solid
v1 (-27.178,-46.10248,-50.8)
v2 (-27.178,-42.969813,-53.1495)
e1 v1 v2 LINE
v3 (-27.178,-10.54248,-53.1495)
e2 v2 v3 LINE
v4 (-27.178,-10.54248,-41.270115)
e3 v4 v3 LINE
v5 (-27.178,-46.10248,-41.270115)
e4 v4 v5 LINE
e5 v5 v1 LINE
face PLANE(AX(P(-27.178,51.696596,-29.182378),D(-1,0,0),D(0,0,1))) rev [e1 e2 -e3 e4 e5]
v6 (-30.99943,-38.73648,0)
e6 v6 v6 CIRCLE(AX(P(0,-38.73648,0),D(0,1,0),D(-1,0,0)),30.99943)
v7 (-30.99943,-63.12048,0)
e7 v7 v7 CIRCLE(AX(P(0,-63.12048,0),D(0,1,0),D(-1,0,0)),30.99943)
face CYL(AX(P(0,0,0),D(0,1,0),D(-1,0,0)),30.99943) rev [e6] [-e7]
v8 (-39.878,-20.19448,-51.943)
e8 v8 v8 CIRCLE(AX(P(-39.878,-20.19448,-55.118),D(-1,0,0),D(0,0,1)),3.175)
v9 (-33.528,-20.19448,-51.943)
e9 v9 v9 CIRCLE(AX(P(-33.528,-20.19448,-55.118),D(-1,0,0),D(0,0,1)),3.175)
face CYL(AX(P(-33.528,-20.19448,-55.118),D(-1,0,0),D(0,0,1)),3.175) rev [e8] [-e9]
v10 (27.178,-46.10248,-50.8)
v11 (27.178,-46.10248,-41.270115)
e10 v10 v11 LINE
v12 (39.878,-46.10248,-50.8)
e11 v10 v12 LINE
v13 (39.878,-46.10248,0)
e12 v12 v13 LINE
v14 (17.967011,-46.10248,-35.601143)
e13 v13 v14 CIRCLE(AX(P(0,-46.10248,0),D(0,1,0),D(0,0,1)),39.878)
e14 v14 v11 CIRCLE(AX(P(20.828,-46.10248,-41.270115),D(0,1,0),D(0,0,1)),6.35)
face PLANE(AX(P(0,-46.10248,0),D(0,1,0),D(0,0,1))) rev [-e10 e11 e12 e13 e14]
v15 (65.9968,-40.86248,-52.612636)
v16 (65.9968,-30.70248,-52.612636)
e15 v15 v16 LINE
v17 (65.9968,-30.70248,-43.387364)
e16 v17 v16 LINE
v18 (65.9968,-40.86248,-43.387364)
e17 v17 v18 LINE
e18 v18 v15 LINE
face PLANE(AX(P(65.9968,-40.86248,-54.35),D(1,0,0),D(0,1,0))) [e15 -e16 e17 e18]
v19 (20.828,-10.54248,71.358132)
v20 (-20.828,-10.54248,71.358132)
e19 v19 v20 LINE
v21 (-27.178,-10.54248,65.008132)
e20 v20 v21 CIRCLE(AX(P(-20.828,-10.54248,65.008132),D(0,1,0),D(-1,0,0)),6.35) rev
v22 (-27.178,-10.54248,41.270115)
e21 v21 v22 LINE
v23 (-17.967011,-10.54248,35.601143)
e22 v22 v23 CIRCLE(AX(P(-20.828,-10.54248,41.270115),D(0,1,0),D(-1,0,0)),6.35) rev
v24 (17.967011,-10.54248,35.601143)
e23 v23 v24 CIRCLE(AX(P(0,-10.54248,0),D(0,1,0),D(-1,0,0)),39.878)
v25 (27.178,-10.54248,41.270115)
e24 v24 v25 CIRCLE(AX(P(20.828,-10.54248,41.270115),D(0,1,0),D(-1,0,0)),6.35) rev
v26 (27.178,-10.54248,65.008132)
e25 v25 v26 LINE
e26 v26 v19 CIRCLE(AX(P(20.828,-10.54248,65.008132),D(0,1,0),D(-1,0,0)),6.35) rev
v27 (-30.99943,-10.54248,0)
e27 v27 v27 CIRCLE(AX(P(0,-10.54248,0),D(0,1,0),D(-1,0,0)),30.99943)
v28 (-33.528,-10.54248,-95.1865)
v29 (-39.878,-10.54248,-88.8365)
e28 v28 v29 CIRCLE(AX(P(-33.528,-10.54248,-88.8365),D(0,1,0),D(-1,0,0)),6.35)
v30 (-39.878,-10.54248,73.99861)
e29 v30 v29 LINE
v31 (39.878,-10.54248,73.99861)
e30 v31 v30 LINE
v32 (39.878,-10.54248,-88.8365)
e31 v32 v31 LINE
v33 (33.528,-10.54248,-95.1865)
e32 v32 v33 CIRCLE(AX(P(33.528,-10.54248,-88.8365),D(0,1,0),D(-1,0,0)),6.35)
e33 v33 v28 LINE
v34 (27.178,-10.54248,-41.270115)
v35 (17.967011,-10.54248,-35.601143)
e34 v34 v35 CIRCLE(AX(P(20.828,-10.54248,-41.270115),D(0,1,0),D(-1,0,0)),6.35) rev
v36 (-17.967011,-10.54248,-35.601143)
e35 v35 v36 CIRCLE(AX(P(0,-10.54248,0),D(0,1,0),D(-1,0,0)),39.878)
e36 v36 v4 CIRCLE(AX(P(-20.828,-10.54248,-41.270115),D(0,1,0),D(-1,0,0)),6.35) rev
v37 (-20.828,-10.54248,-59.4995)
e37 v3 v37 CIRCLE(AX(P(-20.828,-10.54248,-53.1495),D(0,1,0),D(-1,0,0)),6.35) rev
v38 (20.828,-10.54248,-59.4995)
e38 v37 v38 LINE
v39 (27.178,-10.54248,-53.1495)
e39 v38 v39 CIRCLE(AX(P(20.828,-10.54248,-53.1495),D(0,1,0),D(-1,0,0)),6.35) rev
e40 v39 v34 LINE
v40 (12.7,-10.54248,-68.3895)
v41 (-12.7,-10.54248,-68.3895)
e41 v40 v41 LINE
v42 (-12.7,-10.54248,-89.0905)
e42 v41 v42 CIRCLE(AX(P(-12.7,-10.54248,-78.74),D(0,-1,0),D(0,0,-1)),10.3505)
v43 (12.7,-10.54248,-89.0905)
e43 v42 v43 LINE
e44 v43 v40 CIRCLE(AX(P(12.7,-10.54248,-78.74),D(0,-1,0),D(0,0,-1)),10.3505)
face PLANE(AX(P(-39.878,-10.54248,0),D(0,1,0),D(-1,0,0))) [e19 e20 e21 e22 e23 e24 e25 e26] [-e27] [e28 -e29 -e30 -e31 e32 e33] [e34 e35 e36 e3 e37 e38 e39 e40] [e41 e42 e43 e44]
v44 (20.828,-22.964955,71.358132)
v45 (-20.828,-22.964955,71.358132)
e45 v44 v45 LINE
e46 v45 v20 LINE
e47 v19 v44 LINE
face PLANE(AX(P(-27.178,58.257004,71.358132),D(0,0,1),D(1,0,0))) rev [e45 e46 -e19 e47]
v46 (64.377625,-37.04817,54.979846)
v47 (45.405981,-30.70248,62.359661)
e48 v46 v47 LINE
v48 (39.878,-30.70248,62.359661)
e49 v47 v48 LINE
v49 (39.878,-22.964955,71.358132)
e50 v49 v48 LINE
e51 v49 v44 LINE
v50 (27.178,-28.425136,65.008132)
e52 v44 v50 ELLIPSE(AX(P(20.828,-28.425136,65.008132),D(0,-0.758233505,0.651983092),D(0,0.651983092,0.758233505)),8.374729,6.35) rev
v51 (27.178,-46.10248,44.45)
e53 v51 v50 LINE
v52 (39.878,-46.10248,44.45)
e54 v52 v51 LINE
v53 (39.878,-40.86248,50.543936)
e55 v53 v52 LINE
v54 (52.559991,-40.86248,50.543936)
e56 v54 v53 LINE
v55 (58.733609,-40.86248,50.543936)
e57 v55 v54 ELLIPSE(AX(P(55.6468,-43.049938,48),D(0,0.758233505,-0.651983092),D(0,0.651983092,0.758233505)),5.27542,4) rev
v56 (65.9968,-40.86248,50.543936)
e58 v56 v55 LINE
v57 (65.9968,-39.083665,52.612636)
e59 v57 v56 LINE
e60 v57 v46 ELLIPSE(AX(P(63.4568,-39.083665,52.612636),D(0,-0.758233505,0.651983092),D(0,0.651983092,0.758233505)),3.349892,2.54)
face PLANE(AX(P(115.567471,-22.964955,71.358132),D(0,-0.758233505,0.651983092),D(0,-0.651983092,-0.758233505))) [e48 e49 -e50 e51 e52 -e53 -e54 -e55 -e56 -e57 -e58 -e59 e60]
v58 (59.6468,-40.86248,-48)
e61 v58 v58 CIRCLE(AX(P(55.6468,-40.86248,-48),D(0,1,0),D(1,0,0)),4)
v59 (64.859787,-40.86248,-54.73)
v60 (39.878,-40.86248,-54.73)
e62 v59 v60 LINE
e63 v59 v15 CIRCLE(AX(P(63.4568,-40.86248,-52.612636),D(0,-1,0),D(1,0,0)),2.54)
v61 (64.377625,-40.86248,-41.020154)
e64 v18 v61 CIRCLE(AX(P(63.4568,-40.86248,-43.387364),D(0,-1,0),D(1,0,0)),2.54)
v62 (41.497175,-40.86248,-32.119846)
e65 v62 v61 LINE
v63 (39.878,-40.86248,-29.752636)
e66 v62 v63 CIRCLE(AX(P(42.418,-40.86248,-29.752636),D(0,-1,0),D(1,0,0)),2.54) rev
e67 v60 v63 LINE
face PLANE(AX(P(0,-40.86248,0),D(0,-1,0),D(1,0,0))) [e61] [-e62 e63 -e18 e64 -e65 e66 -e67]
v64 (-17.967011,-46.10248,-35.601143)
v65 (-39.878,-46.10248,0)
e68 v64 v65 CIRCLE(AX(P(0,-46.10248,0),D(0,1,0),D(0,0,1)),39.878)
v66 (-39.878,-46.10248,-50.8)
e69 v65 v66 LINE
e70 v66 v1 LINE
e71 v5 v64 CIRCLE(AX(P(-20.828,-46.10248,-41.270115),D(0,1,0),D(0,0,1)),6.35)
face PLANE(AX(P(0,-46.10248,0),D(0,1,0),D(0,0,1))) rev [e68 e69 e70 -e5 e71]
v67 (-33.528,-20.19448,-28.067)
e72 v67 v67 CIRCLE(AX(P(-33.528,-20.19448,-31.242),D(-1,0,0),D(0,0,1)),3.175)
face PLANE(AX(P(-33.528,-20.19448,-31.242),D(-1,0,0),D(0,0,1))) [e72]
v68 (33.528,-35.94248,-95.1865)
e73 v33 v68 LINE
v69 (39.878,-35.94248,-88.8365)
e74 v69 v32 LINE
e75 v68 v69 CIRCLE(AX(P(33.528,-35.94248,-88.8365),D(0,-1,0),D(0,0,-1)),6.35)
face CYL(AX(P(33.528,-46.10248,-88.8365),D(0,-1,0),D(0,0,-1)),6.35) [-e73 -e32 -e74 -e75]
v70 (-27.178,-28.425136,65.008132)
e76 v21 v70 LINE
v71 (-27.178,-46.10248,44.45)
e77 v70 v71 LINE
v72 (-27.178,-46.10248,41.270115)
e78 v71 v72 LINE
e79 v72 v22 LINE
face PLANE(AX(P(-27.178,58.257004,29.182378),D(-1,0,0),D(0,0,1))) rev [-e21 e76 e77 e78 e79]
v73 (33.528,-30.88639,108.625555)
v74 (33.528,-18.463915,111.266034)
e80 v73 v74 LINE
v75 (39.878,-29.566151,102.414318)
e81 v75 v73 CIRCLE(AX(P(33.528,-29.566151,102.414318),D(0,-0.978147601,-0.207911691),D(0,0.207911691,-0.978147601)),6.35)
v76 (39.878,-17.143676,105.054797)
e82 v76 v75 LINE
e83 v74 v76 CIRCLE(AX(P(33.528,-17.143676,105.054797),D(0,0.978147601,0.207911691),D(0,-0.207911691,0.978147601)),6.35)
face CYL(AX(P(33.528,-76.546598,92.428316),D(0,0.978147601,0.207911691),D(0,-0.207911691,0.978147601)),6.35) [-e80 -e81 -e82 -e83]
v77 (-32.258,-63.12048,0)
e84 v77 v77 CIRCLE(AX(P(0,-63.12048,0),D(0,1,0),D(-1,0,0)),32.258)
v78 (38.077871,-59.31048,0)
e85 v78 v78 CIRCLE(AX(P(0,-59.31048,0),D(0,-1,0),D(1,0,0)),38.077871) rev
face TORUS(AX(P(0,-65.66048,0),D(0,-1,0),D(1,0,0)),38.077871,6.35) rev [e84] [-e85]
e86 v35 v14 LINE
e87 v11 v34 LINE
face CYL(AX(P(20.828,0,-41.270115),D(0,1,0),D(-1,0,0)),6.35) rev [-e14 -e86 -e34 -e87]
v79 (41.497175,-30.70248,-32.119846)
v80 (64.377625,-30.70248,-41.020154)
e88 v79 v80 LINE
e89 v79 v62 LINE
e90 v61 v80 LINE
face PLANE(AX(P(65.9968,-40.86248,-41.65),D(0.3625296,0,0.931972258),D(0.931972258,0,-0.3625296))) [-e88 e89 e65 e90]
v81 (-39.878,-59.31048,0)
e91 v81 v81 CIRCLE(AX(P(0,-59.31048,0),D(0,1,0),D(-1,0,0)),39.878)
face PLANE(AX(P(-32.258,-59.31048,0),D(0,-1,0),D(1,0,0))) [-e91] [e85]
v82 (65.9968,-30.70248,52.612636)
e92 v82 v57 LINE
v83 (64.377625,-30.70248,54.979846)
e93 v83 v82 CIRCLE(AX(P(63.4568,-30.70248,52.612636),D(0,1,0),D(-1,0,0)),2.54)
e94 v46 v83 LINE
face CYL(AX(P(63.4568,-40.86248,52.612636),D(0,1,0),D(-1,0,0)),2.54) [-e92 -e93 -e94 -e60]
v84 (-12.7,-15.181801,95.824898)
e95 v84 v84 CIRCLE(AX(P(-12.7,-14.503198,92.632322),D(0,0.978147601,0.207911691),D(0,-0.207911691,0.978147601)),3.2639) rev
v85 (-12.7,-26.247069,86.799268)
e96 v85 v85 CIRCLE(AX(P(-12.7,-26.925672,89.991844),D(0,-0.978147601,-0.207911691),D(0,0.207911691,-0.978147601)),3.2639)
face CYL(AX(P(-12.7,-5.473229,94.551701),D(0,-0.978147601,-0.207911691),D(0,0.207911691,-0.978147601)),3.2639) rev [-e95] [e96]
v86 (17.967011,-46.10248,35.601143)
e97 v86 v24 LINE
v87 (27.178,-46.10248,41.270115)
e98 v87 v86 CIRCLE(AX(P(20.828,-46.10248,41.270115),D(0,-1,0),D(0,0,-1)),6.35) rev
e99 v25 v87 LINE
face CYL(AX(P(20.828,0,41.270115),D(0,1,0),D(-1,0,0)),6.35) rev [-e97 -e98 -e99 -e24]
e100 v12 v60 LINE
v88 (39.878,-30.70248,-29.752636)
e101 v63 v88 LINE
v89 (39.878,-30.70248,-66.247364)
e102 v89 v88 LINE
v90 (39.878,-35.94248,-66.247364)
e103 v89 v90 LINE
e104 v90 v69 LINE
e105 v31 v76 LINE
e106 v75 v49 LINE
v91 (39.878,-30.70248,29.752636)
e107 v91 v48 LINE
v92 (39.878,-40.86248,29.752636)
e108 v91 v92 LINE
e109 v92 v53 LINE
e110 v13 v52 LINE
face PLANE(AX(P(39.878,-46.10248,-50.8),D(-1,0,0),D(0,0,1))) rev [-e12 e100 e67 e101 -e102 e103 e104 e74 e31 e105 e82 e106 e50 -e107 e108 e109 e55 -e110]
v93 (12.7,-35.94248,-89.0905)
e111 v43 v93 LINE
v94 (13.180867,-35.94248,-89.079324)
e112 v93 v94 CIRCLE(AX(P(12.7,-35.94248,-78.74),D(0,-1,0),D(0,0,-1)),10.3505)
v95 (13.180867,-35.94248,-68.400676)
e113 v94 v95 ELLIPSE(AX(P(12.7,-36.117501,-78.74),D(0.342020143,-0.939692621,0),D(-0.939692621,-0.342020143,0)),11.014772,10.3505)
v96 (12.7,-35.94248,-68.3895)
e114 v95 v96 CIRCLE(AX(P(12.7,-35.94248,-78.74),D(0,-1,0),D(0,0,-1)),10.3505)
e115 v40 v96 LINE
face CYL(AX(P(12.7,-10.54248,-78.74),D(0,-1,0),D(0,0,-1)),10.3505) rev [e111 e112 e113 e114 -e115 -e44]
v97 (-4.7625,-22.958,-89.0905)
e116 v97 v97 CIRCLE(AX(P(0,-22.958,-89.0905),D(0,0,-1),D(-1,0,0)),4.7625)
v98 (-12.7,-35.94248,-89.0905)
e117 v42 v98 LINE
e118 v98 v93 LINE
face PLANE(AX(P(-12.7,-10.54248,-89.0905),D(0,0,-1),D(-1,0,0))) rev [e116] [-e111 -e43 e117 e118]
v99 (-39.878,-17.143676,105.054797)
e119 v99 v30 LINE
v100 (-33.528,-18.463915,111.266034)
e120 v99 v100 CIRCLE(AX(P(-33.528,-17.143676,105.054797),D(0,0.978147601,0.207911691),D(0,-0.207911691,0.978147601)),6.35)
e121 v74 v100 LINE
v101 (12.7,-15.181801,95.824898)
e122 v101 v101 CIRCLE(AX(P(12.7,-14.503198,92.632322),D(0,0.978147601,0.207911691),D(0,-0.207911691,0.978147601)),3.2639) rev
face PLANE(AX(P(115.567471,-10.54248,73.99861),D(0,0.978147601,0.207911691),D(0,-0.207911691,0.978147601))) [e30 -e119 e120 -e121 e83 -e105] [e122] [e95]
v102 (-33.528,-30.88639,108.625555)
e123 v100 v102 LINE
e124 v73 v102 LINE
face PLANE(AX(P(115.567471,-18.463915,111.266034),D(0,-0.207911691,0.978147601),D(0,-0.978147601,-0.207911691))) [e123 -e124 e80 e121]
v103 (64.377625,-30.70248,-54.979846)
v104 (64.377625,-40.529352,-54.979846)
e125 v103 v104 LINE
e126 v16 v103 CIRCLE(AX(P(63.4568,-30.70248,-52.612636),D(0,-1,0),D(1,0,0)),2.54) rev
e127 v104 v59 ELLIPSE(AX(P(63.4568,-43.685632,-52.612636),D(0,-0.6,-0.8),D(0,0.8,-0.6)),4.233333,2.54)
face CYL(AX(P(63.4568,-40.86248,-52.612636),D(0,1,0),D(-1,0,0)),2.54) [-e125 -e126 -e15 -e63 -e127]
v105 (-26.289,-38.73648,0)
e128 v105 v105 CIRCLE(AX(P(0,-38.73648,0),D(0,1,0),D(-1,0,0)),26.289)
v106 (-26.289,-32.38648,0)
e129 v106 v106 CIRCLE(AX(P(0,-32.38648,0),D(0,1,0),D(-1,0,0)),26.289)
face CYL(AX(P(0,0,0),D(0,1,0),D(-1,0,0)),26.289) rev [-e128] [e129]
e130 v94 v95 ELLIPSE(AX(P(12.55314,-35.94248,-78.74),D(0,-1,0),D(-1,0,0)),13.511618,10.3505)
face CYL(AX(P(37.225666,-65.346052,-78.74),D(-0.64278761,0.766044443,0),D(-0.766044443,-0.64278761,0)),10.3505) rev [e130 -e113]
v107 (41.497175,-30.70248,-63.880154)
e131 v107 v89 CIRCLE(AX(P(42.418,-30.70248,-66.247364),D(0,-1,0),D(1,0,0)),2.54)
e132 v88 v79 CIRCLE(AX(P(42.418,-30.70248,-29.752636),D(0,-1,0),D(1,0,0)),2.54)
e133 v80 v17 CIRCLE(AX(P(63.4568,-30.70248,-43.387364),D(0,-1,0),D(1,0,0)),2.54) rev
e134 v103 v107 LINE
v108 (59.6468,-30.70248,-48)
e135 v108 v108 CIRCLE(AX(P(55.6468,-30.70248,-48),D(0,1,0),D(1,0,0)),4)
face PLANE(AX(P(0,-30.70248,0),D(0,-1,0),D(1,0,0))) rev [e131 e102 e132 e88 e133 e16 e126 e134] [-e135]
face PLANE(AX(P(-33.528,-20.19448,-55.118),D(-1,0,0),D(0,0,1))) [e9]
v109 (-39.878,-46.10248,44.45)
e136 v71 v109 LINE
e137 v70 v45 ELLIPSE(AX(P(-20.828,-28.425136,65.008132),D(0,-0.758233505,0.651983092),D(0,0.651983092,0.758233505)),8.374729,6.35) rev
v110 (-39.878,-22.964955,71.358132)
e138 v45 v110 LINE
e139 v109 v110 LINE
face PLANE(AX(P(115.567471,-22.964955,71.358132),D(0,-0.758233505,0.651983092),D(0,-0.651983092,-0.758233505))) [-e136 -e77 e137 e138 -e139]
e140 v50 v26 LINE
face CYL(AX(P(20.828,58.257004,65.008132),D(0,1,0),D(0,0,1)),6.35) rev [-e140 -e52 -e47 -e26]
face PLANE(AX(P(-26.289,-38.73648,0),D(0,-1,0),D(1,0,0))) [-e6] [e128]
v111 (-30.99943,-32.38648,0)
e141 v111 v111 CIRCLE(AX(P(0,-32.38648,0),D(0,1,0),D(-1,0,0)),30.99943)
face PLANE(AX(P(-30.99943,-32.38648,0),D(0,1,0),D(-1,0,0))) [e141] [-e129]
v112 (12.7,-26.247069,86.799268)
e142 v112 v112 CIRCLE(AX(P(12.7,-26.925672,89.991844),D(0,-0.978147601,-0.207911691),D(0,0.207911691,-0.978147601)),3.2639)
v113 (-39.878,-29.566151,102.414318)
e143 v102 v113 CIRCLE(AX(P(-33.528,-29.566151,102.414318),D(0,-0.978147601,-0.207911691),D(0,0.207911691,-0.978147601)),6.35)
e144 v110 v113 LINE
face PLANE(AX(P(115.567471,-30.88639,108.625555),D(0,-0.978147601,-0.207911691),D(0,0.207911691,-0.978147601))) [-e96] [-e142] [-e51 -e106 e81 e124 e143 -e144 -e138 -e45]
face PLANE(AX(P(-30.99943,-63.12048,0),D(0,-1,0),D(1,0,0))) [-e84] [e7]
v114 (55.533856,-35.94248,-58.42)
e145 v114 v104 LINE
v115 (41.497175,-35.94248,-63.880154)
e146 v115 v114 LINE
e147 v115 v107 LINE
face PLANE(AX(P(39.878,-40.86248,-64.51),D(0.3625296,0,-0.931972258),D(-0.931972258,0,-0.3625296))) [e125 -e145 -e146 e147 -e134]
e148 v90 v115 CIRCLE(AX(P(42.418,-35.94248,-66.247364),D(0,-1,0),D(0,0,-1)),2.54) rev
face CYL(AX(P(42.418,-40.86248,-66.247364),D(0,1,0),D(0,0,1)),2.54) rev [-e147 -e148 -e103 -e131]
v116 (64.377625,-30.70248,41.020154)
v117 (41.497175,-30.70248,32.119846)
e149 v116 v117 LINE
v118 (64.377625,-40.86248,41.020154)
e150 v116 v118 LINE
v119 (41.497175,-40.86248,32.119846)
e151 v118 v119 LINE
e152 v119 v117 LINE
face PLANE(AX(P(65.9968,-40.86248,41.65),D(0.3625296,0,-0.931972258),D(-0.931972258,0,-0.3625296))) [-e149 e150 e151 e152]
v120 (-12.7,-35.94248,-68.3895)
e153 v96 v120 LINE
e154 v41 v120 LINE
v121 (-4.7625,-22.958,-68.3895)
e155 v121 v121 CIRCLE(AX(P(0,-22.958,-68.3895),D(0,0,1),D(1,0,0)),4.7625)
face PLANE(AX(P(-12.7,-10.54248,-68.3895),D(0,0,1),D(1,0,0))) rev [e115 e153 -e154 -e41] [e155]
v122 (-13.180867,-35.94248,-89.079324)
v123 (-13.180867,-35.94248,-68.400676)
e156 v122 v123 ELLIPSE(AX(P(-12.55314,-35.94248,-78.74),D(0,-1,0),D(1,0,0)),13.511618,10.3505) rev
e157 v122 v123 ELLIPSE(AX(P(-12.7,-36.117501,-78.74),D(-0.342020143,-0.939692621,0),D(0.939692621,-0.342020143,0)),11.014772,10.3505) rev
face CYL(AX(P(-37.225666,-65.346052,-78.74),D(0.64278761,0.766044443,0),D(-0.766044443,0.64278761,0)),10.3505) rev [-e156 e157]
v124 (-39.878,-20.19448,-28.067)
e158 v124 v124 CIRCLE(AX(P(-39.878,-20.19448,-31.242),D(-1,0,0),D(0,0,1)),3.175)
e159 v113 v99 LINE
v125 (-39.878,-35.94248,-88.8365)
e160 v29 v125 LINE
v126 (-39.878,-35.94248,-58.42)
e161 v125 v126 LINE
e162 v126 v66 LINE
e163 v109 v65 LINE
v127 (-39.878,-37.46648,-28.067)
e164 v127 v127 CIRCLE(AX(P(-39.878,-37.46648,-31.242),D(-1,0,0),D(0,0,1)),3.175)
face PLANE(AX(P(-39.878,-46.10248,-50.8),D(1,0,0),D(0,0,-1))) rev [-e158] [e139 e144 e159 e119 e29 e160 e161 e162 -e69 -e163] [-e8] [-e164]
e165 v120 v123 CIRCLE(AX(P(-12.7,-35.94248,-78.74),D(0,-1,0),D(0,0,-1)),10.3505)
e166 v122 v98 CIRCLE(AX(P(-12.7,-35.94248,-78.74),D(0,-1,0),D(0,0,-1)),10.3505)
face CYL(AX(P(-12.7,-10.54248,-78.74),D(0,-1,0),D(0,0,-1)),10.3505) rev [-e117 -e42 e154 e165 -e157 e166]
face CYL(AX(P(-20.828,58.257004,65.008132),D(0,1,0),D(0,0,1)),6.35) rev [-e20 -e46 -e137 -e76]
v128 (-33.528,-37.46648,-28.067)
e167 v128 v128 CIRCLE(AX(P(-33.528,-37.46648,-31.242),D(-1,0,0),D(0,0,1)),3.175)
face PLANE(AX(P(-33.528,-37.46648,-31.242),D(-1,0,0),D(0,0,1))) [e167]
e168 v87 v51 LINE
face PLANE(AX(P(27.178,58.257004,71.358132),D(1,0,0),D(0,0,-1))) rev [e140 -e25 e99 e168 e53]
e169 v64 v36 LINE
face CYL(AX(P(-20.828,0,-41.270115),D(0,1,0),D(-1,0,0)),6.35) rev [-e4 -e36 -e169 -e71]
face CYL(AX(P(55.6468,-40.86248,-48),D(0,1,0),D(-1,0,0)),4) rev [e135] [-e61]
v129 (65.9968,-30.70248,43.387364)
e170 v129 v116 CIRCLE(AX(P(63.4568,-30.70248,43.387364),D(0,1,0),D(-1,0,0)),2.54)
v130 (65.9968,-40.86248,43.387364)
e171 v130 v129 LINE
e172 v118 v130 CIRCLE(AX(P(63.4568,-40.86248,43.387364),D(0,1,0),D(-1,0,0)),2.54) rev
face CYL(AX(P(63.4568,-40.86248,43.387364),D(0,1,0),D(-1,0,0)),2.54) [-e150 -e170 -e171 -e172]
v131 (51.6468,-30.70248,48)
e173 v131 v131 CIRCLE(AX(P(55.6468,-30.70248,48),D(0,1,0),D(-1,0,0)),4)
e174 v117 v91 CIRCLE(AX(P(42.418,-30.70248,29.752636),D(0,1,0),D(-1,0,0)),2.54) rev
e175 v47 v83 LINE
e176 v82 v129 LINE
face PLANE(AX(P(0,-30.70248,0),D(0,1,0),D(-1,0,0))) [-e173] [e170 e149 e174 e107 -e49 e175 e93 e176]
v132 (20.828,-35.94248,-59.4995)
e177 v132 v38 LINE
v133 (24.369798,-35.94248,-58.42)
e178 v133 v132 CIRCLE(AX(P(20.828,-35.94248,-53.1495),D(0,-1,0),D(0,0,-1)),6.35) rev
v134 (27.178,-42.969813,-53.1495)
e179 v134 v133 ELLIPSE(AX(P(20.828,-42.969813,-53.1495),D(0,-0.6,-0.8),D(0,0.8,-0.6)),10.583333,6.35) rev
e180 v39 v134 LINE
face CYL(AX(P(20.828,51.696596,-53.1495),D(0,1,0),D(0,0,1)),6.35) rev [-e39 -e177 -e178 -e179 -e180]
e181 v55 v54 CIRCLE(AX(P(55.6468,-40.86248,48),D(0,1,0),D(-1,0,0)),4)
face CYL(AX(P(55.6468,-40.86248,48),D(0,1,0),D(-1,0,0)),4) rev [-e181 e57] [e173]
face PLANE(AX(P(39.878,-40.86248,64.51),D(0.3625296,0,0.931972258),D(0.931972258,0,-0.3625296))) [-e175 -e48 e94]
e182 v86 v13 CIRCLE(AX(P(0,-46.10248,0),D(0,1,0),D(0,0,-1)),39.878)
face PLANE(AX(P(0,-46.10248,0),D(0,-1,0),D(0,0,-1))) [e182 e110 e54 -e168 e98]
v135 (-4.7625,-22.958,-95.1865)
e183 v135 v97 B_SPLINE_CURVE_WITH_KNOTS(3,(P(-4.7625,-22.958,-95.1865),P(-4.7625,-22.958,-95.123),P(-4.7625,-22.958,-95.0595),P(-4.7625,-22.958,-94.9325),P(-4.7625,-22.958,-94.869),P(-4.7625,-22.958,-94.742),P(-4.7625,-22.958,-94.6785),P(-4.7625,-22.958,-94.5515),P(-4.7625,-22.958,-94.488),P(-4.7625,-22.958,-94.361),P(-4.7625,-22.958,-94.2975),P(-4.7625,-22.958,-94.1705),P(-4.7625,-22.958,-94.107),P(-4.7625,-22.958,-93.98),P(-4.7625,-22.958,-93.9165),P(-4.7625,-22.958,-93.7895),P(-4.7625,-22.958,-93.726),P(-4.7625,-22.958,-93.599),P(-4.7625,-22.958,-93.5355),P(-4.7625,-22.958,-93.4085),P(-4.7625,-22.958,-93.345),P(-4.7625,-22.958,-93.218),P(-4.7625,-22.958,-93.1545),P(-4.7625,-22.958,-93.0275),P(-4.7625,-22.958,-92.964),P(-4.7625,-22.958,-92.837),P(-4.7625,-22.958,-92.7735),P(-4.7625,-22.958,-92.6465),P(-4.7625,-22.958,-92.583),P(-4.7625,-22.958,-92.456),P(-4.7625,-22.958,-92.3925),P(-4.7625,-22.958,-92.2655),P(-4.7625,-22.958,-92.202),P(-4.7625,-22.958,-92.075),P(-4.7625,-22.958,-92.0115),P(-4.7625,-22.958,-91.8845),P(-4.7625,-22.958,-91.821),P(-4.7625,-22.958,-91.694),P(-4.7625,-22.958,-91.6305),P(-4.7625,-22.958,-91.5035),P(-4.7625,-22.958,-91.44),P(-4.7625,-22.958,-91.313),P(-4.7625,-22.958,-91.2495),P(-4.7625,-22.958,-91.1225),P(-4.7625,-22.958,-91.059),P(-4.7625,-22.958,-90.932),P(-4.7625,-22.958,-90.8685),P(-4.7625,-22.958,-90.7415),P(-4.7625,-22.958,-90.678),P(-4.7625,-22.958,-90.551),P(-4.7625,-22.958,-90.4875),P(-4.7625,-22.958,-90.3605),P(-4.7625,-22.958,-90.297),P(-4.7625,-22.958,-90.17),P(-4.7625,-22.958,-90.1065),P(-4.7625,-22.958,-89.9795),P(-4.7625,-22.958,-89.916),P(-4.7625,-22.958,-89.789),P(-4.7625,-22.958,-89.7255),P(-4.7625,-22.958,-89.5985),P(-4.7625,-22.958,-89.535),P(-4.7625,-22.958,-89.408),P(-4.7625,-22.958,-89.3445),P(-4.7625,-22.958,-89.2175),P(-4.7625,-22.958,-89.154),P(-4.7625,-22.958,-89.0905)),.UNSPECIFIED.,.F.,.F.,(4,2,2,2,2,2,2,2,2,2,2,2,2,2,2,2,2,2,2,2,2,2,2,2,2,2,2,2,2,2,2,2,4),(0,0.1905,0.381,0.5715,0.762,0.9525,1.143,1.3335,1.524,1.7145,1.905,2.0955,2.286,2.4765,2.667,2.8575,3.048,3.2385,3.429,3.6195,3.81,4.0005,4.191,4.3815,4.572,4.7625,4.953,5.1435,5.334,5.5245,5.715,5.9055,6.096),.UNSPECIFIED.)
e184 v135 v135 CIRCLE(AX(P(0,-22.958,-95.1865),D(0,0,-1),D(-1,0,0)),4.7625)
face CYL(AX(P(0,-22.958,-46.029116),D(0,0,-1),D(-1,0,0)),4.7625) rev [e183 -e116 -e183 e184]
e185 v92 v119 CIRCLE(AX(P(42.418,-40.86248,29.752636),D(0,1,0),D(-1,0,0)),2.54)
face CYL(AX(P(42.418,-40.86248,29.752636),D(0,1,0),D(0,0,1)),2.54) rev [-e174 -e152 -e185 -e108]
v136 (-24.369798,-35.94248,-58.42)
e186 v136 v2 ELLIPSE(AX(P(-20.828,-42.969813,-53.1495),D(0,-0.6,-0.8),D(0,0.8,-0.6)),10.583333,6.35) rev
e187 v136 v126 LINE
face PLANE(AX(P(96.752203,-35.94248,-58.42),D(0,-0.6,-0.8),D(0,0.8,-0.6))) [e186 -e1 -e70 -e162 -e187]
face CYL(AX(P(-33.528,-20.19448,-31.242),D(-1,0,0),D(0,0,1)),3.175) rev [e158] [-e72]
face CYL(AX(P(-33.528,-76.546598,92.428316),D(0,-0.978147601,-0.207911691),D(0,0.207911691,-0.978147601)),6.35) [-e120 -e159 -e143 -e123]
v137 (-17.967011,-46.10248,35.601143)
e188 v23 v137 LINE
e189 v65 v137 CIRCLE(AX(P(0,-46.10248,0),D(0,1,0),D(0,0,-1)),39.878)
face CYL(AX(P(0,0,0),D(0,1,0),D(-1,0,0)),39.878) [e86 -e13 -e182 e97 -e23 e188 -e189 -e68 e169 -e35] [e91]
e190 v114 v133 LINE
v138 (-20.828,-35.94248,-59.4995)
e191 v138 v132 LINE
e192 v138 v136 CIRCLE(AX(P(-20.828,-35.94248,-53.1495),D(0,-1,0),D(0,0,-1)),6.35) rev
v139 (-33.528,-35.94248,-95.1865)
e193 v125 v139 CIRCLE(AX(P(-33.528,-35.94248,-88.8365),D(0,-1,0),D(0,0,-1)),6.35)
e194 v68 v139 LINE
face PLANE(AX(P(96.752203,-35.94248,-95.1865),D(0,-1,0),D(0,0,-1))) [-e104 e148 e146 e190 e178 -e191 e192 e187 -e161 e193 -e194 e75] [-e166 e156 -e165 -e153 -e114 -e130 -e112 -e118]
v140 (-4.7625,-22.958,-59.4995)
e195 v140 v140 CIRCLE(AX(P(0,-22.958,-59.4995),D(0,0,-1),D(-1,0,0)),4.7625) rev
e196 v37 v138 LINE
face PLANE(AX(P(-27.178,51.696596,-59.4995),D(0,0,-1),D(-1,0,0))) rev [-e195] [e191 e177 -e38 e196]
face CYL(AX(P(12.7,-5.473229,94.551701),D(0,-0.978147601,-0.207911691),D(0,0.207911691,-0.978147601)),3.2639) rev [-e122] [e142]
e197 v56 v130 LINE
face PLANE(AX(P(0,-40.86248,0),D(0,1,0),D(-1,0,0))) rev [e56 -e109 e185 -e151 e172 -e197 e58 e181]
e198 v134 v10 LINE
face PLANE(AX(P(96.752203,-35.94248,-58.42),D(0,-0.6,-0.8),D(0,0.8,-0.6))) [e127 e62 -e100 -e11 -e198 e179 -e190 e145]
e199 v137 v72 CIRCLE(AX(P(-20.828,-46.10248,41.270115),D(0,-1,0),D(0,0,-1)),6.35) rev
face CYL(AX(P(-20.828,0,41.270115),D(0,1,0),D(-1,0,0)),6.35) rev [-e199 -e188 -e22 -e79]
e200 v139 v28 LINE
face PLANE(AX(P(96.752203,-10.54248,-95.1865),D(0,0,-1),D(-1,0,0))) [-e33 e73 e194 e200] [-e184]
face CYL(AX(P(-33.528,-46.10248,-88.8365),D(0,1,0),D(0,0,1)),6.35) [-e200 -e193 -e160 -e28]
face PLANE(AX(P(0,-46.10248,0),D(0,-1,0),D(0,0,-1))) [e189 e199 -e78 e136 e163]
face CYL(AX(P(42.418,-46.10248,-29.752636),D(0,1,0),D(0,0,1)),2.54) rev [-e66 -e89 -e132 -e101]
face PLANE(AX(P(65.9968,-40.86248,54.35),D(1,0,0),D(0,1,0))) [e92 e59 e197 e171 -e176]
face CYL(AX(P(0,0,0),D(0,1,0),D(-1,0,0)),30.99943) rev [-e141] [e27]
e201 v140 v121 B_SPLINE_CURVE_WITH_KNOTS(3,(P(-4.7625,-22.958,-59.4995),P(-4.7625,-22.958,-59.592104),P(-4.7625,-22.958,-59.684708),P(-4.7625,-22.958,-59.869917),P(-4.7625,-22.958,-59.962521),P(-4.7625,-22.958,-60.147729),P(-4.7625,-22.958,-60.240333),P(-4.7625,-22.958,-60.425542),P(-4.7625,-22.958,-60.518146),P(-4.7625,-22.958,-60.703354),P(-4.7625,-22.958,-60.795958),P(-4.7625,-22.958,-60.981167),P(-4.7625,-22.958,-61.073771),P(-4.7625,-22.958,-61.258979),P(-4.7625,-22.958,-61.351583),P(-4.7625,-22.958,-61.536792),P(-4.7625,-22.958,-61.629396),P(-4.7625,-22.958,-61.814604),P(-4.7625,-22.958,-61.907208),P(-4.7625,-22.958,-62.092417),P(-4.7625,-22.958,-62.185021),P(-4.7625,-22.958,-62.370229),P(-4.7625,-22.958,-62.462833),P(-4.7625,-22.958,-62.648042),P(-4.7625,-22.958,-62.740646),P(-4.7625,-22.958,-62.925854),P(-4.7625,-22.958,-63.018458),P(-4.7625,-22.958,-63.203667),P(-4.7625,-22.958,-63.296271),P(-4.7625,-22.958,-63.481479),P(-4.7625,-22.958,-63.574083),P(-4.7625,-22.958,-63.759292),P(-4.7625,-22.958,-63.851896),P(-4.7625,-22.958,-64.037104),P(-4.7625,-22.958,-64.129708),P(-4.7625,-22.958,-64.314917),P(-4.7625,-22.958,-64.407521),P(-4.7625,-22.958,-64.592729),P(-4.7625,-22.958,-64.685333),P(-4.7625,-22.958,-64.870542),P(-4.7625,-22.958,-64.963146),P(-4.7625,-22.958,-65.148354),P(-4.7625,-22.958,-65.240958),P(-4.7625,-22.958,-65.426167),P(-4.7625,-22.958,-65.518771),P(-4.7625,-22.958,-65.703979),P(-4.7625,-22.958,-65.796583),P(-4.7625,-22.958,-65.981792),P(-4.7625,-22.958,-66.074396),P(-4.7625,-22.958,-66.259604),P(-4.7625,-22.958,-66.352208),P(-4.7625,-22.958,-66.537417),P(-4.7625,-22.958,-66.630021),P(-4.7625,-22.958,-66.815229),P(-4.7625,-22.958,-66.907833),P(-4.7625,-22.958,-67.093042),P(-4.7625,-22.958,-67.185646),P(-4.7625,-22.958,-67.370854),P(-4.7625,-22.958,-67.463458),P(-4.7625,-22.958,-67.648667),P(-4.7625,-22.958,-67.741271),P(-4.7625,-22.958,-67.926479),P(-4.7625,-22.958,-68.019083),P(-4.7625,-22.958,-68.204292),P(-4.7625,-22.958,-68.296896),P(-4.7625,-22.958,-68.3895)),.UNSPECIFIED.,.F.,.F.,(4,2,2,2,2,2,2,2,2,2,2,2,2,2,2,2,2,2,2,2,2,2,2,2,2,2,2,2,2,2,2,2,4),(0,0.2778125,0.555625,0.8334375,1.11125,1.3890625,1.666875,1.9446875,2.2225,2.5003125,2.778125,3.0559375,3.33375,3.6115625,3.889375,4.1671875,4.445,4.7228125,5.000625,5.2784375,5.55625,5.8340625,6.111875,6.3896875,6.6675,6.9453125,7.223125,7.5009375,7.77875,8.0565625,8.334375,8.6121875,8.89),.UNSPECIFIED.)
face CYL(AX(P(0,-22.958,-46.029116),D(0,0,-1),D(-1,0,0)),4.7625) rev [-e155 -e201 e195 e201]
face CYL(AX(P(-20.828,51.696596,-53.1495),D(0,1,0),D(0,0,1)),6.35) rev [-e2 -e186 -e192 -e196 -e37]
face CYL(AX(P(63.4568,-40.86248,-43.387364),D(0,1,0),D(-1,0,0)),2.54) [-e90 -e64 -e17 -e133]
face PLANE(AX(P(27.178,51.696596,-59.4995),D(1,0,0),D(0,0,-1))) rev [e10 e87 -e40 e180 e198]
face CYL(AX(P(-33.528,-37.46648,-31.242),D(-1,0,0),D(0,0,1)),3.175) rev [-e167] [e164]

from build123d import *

# Parameters (mm, degrees)
BEARING_FILLET_R         = 6.35
LBJ_PREP_DEPTH           = 35.56
LBJ_EXTRUDE_DEPTH        = 79.756
LBJ_SLOT_DEPTH           = 107.720983645
LBJ_WEIGHT_SAIVNG_REACH  = 111.157
LBJ_FILLET_R             = 6.35
LBJ_HOLE_REACH           = 156.327
SKETCH12_R               = 4.7625
LBJ_WIDENING_DEPTH       = 147.443500502
UBJ_AREA_PREP_DEPTH      = 35.56
UBJ_ANGLE_MOUNT_DEPTH    = 79.756
SKETCH7_R                = 3.2639
CAMBER_BLOCK_HOLES_DEPTH = 12.7
UBJ_WEIGHT_SAVING_REACH  = 125.43
UBJ_FILLETS_R            = 6.35
SKETCH13_R               = 4
BRAKE_ARMS_DEPTH         = 10.16
UPPER_BRAKE_CUT_DEPTH    = 151.749278078
LOWER_BRAKE_CUT_DEPTH    = 151.749278078
FILLET1_R                = 2.54
SKETCH14_R               = 3.175
TIE_ROD_MOUND_DEPTH      = 6.35
FILLET2_R                = 6.35


with BuildPart() as part:
    # Sketch1 → Bearing Housing (revolve)
    with BuildSketch(Plane.XY):
        Polygon((-30.99943, -10.54248), (-30.99943, -32.38648), (-26.289, -32.38648), (-26.289, -38.73648), (-30.99943, -38.73648), (-30.99943, -63.12048), (-32.258, -63.12048), (-32.258, -59.31048), (-39.878, -59.31048), (-39.878, -10.54248), align=None)
    revolve(axis=Axis((0, 0, 0), (0, -1, 0)))

    # Bearing Fillet
    # the kernel refuses this fillet: 6.35 mm, written as the material it adds along each edge
    with BuildSketch(Plane(origin=(0, -59.31048, 0), x_dir=(-1, 0, 0), z_dir=(0, 0, 1))) as bearing_fillet_piece_1:
        with BuildLine():
            CenterArc((38.077871133, 6.35), BEARING_FILLET_R, 203.578178478, 66.421821522)
            Line((38.077871133, 0), (38.077871133, -0.127))
            Line((38.077871133, -0.127), (32.258, -0.127))
            Line((32.258, -0.127), (32.131, 0))
            ThreePointArc((32.131, 0), (32.131, 1.905), (32.141602577, 3.7592))
            Line((32.141602577, 3.7592), (32.258, 3.81))
        make_face()
    revolve(axis=Axis((0, -59.31048, 0), (0, -1, 0)))

    # Sketch2 → LBJ Prep (add)
    with BuildSketch(Plane(origin=(0, -10.54248, 0), x_dir=(-1, 0, 0), z_dir=(0, -1, 0))):
        with BuildLine():
            Line((-39.878, 50.8), (-39.878, 0))
            ThreePointArc((-39.878, 0), (0, 39.878), (39.878, 0))
            Line((39.878, 0), (39.878, 50.8))
            Line((39.878, 50.8), (-39.878, 50.8))
        make_face()
    extrude(amount=LBJ_PREP_DEPTH)

    # Sketch3 → LBJ Extrude (add)
    with BuildSketch(Plane.ZY.offset(39.878)):
        Polygon((-50.8, -10.54248), (-95.1865, -10.54248), (-95.1865, -35.94248), (-58.42, -35.94248), (-50.8, -46.10248), align=None)
    extrude(amount=-LBJ_EXTRUDE_DEPTH)

    # Sketch4 → LBJ Slot (cut, through all)
    with BuildSketch(Plane.XZ.offset(35.94248)):
        with BuildLine():
            Line((-12.7, -68.3895), (12.7, -68.3895))
            ThreePointArc((12.7, -68.3895), (23.0505, -78.74), (12.7, -89.0905))
            Line((12.7, -89.0905), (-12.7, -89.0905))
            ThreePointArc((-12.7, -89.0905), (-23.0505, -78.74), (-12.7, -68.3895))
        make_face()
    extrude(amount=-LBJ_SLOT_DEPTH, mode=Mode.SUBTRACT)

    # Sketch8 → LBJ Weight Saivng (cut, up to next)
    with BuildSketch(Plane.XZ.offset(46.10248), mode=Mode.PRIVATE) as lbj_weight_saivng_sk1:
        with BuildLine():
            Line((-27.178, -29.182378244), (-27.178, -59.4995))
            Line((-27.178, -59.4995), (27.178, -59.4995))
            Line((27.178, -59.4995), (27.178, -29.182378244))
            ThreePointArc((27.178, -29.182378244), (0, -39.878), (-27.178, -29.182378244))
        make_face()
    lbj_weight_saivng_tool1 = extrude(lbj_weight_saivng_sk1.sketch, amount=-LBJ_WEIGHT_SAIVNG_REACH, mode=Mode.PRIVATE) & part.part
    add(lbj_weight_saivng_tool1.solids().sort_by_distance((0, -46.10248, -47.803718))[0], mode=Mode.SUBTRACT)

    # LBJ Fillet
    # the kernel refuses this fillet: 6.35 mm, written as the material it adds along each edge
    with BuildSketch(Plane(origin=(-27.178, -35.94248, -59.4995), x_dir=(0, 0, 1), z_dir=(0, 1, 0))) as lbj_fillet_piece_1_section:
        with BuildLine():
            CenterArc((LBJ_FILLET_R, LBJ_FILLET_R), LBJ_FILLET_R, 180, 90)
            Line((0, LBJ_FILLET_R), (0, 0))
            Line((0, 0), (LBJ_FILLET_R, 0))
        make_face()
    lbj_fillet_piece_1 = extrude(amount=25.4, mode=Mode.PRIVATE)
    lbj_fillet_piece_1 = split(lbj_fillet_piece_1, bisect_by=Plane(origin=(-24.73120958, -35.160405559, -59.00655583), z_dir=(0, -0.6000000000000006, -0.7999999999999996)), keep=Keep.TOP, mode=Mode.PRIVATE)
    add(lbj_fillet_piece_1)
    with BuildSketch(Plane(origin=(-27.178, -51.81748, -59.4995), x_dir=(0, 0, 1), z_dir=(0, 1, 0))) as lbj_fillet_piece_2_section:
        with BuildLine():
            CenterArc((LBJ_FILLET_R, LBJ_FILLET_R), LBJ_FILLET_R, 180, 90)
            Line((0, LBJ_FILLET_R), (0, 0))
            Line((0, 0), (LBJ_FILLET_R, 0))
        make_face()
    lbj_fillet_piece_2 = extrude(amount=41.275, mode=Mode.PRIVATE)
    lbj_fillet_piece_2 = split(lbj_fillet_piece_2, bisect_by=Plane(origin=(-26.809097356, -38.125416815, -56.782797389), z_dir=(0, 0.6000000000000006, 0.7999999999999996)), keep=Keep.TOP, mode=Mode.PRIVATE)
    lbj_fillet_piece_2 = split(lbj_fillet_piece_2, bisect_by=Plane(origin=(-26.809097356, -35.94248, -56.0123491), z_dir=(0, -1, 0)), keep=Keep.TOP, mode=Mode.PRIVATE)
    add(lbj_fillet_piece_2)
    with BuildSketch(Plane(origin=(-27.178, -35.94248, -59.4995), x_dir=(0, 0, 1), z_dir=(0, 1, 0))) as lbj_fillet_piece_3_section:
        with BuildLine():
            CenterArc((LBJ_FILLET_R, LBJ_FILLET_R), LBJ_FILLET_R, 180, 90)
            Line((0, LBJ_FILLET_R), (0, 0))
            Line((0, 0), (LBJ_FILLET_R, 0))
        make_face()
    lbj_fillet_piece_3 = extrude(amount=25.4, mode=Mode.PRIVATE)
    lbj_fillet_piece_3 = split(lbj_fillet_piece_3, bisect_by=Plane(origin=(-25.759204024, -27.852635119, -64.487383661), z_dir=(0, 0.6000000000000006, 0.7999999999999996)), keep=Keep.TOP, mode=Mode.PRIVATE)
    add(lbj_fillet_piece_3)
    with BuildSketch(Plane(origin=(27.178, -35.94248, -59.4995), x_dir=(0, 0, 1), z_dir=(0, 1, 0))) as lbj_fillet_piece_4_section:
        with BuildLine():
            CenterArc((LBJ_FILLET_R, -LBJ_FILLET_R), LBJ_FILLET_R, 90, 90)
            Line((0, -LBJ_FILLET_R), (0, 0))
            Line((0, 0), (LBJ_FILLET_R, 0))
        make_face()
    lbj_fillet_piece_4 = extrude(amount=25.4, mode=Mode.PRIVATE)
    lbj_fillet_piece_4 = split(lbj_fillet_piece_4, bisect_by=Plane(origin=(24.73120958, -35.160405559, -59.00655583), z_dir=(0, -0.6000000000000006, -0.7999999999999996)), keep=Keep.TOP, mode=Mode.PRIVATE)
    add(lbj_fillet_piece_4)
    with BuildSketch(Plane(origin=(27.178, -51.81748, -59.4995), x_dir=(0, 0, 1), z_dir=(0, 1, 0))) as lbj_fillet_piece_5_section:
        with BuildLine():
            CenterArc((LBJ_FILLET_R, -LBJ_FILLET_R), LBJ_FILLET_R, 90, 90)
            Line((0, -LBJ_FILLET_R), (0, 0))
            Line((0, 0), (LBJ_FILLET_R, 0))
        make_face()
    lbj_fillet_piece_5 = extrude(amount=41.275, mode=Mode.PRIVATE)
    lbj_fillet_piece_5 = split(lbj_fillet_piece_5, bisect_by=Plane(origin=(26.809097356, -35.94248, -56.0123491), z_dir=(0, -1, 0)), keep=Keep.TOP, mode=Mode.PRIVATE)
    lbj_fillet_piece_5 = split(lbj_fillet_piece_5, bisect_by=Plane(origin=(26.809097356, -38.125416815, -56.782797389), z_dir=(0, 0.6000000000000006, 0.7999999999999996)), keep=Keep.TOP, mode=Mode.PRIVATE)
    add(lbj_fillet_piece_5)
    with BuildSketch(Plane(origin=(27.178, -35.94248, -59.4995), x_dir=(0, 0, 1), z_dir=(0, 1, 0))) as lbj_fillet_piece_6_section:
        with BuildLine():
            CenterArc((LBJ_FILLET_R, -LBJ_FILLET_R), LBJ_FILLET_R, 90, 90)
            Line((0, -LBJ_FILLET_R), (0, 0))
            Line((0, 0), (LBJ_FILLET_R, 0))
        make_face()
    lbj_fillet_piece_6 = extrude(amount=25.4, mode=Mode.PRIVATE)
    lbj_fillet_piece_6 = split(lbj_fillet_piece_6, bisect_by=Plane(origin=(25.759204024, -27.852635119, -64.487383661), z_dir=(0, 0.6000000000000006, 0.7999999999999996)), keep=Keep.TOP, mode=Mode.PRIVATE)
    add(lbj_fillet_piece_6)
    with BuildSketch(Plane(origin=(27.178, -46.10248, -29.182378244), x_dir=(-0.8204405839916293, 0, -0.5717317973835934), z_dir=(0, 1, 0))) as lbj_fillet_piece_7:
        with BuildLine():
            CenterArc((12.120741225, -6.286772968), LBJ_FILLET_R, 98.09213616, 116.778941593)
            Line((6.910943516, -9.917269881), (0, 0))
            ThreePointArc((0, 0), (5.613440626, -0.397065762), (11.226881252, 0))
        make_face()
    extrude(amount=35.56)
    with BuildSketch(Plane(origin=(-27.178, -46.10248, -29.182378244), x_dir=(0.8204405839916298, 0, -0.5717317973835926), z_dir=(0, 1, 0))) as lbj_fillet_piece_8:
        with BuildLine():
            CenterArc((12.120741225, 6.286772968), LBJ_FILLET_R, 145.128922247, 116.778941593)
            Line((6.910943516, 9.917269881), (0, 0))
            ThreePointArc((0, 0), (5.613440626, 0.397065762), (11.226881252, 0))
        make_face()
    extrude(amount=35.56)

    # LBJ Hole: up to this face of the body (flat: up to its plane)
    lbj_hole_end = Plane(part.part.faces().sort_by_distance((0, -23.24248, -59.4995))[0])
    # Sketch12 → LBJ Hole (cut, up to the picked face)
    with BuildSketch(Plane(origin=(0, 0, -95.1865), x_dir=(-1, 0, 0), z_dir=(0, 0, -1)), mode=Mode.PRIVATE) as lbj_hole_sk1:
        with Locations((0, -22.958000058)):
            Circle(SKETCH12_R)
    lbj_hole_tool1 = split(extrude(lbj_hole_sk1.sketch, amount=-LBJ_HOLE_REACH, mode=Mode.PRIVATE), bisect_by=lbj_hole_end, keep=Keep.BOTH, mode=Mode.PRIVATE)
    add(lbj_hole_tool1.solids().sort_by(Axis((0, -22.958, -95.1865), (0, 0, 1)))[0], mode=Mode.SUBTRACT)

    # Sketch17 → LBJ Widening (cut, through all)
    with BuildSketch(Plane(origin=(0, -22.958000058, -95.1865), x_dir=(-0.7660444431189768, 0.6427876096865408, 0), z_dir=(-0.6427876096865408, -0.7660444431189768, 0))):
        with BuildLine():
            Line((-1.27, -6.096), (1.27, -6.096))
            ThreePointArc((1.27, -6.096), (11.6205, -16.4465), (1.27, -26.797))
            Line((1.27, -26.797), (-1.27, -26.797))
            ThreePointArc((-1.27, -26.797), (-11.6205, -16.4465), (-1.27, -6.096))
        make_face()
    lbj_widening = extrude(amount=LBJ_WIDENING_DEPTH, mode=Mode.SUBTRACT)

    # LBJ Widening 2: LBJ Widening across plane
    add(lbj_widening.mirror(Plane(origin=(0, 0, 0), x_dir=(0, 0, 1), z_dir=(1, 0, 0))), mode=Mode.SUBTRACT)

    # Sketch5 → UBJ Area Prep (add)
    with BuildSketch(Plane(origin=(0, -10.54248, 0), x_dir=(-1, 0, 0), z_dir=(0, -1, 0))):
        with BuildLine():
            Line((-39.878, -44.45), (39.878, -44.45))
            Line((39.878, -44.45), (39.878, 0))
            ThreePointArc((39.878, 0), (0, -39.878), (-39.878, 0))
            Line((-39.878, 0), (-39.878, -44.45))
        make_face()
    extrude(amount=UBJ_AREA_PREP_DEPTH)

    # UBJ Angle → UBJ Angle Mount (add)
    with BuildSketch(Plane.ZY.offset(39.878)):
        Polygon((44.45, -10.54248), (73.998610356, -10.54248), (111.266033944, -18.46391542), (108.62555547, -30.886389949), (71.358131882, -22.964954529), (44.45, -46.10248), align=None)
    extrude(amount=-UBJ_ANGLE_MOUNT_DEPTH)

    # Sketch7 → Camber Block Holes (cut)
    with BuildSketch(Plane(origin=(0, -7.460258703, -1.585726939), x_dir=(1, 0, 0), z_dir=(0, -0.9781476007338056, -0.2079116908177598))):
        with Locations(Location((-12.7, 93.623468019, 0), (0, 0, 270))):
            Circle(SKETCH7_R)
        with Locations(Location((12.7, 93.623468019, 0), (0, 0, 270))):
            Circle(SKETCH7_R)
    extrude(amount=-CAMBER_BLOCK_HOLES_DEPTH, mode=Mode.SUBTRACT)

    # Sketch9 → UBJ Weight Saving (cut, up to next)
    with BuildSketch(Plane.XZ.offset(46.10248), mode=Mode.PRIVATE) as ubj_weight_saving_sk1:
        with BuildLine():
            Line((-27.178, 29.182378244), (-27.178, 71.358131882))
            Line((-27.178, 71.358131882), (27.178, 71.358131882))
            Line((27.178, 71.358131882), (27.178, 29.182378244))
            ThreePointArc((27.178, 29.182378244), (0, 39.878), (-27.178, 29.182378244))
        make_face()
    ubj_weight_saving_tool1 = extrude(ubj_weight_saving_sk1.sketch, amount=-UBJ_WEIGHT_SAVING_REACH, mode=Mode.PRIVATE) & part.part
    add(ubj_weight_saving_tool1.solids().sort_by_distance((0, -46.10248, 53.804717))[0], mode=Mode.SUBTRACT)

    # UBJ Fillets
    ubj_fillets_edges = [part.edges().sort_by_distance(p)[0] for p in [
        (27.178, -16.753717265, 71.358131882),
        (-27.178, -16.753717265, 71.358131882),
        (-27.178, -28.32248, 29.182378244),
        (27.178, -28.32248, 29.182378244),
    ]]
    fillet(ubj_fillets_edges, radius=UBJ_FILLETS_R)

    # Sketch13 → Brake Arms (add)
    # profile 1 of 2: a face of its own
    with BuildSketch(Plane(origin=(0, -30.702480066, 0), x_dir=(1, 0, 0), z_dir=(0, 1, 0))):
        Polygon((65.996800061, -54.35), (65.996800061, -41.65), (39.878, -31.49), (39.878, -64.51), align=None)
        with Locations(Location((55.64680006, -48, 0), (0, 0, 180))):
            Circle(SKETCH13_R, mode=Mode.SUBTRACT)
    # profile 2 of 2: a face of its own
    with BuildSketch(Plane(origin=(0, -30.702480066, 0), x_dir=(1, 0, 0), z_dir=(0, 1, 0))):
        Polygon((39.878, 31.49), (39.878, 64.51), (65.996800061, 54.35), (65.996800061, 41.65), align=None)
        with Locations((55.64680006, 48)):
            Circle(SKETCH13_R, mode=Mode.SUBTRACT)
    extrude(amount=-BRAKE_ARMS_DEPTH)

    # Sketch15 → Upper Brake Cut (cut, through all)
    with BuildSketch(Plane.ZY.offset(-39.878)):
        Polygon((64.51, -28.853465354), (50.543936427, -40.862480066), (64.51, -40.862480066), align=None)
    extrude(amount=-UPPER_BRAKE_CUT_DEPTH, mode=Mode.SUBTRACT)

    # Sketch16 → Lower Brake Cut (cut, through all)
    with BuildSketch(Plane.ZY.offset(-39.878)):
        Polygon((-58.42, -35.94248), (-95.1865, -35.94248), (-95.1865, -46.10248), (-50.8, -46.10248), align=None)
    extrude(amount=-LOWER_BRAKE_CUT_DEPTH, mode=Mode.SUBTRACT)

    # Fillet1
    fillet1_edges = [part.edges().sort_by_distance(p)[0] for p in [
        (65.996800061, -34.146117994, 54.35),
        (65.996800061, -35.782480066, 41.65),
        (65.996800061, -35.782480066, -41.65),
        (65.996800061, -35.782480066, -54.35),
        (39.878, -33.322480033, -64.51),
        (39.878, -35.782480066, -31.49),
        (39.878, -35.782480066, 31.49),
    ]]
    fillet(fillet1_edges, radius=FILLET1_R)

    # Sketch14 → Tie Rod Mound (cut)
    with BuildSketch(Plane.ZY.offset(39.878)):
        with Locations((-31.242, -20.19448)):
            Circle(SKETCH14_R)
        with Locations((-31.242, -37.46648)):
            Circle(SKETCH14_R)
        with Locations((-55.118, -20.19448)):
            Circle(SKETCH14_R)
    extrude(amount=-TIE_ROD_MOUND_DEPTH, mode=Mode.SUBTRACT)

    # Fillet2
    fillet2_edges = [part.edges().sort_by_distance(p)[0] for p in [
        (-39.878, -24.675152685, 109.945794707),
        (39.878, -24.675152685, 109.945794707),
        (-39.878, -23.24248, -95.1865),
        (39.878, -23.24248, -95.1865),
    ]]
    fillet(fillet2_edges, radius=FILLET2_R)


solid = part.part
